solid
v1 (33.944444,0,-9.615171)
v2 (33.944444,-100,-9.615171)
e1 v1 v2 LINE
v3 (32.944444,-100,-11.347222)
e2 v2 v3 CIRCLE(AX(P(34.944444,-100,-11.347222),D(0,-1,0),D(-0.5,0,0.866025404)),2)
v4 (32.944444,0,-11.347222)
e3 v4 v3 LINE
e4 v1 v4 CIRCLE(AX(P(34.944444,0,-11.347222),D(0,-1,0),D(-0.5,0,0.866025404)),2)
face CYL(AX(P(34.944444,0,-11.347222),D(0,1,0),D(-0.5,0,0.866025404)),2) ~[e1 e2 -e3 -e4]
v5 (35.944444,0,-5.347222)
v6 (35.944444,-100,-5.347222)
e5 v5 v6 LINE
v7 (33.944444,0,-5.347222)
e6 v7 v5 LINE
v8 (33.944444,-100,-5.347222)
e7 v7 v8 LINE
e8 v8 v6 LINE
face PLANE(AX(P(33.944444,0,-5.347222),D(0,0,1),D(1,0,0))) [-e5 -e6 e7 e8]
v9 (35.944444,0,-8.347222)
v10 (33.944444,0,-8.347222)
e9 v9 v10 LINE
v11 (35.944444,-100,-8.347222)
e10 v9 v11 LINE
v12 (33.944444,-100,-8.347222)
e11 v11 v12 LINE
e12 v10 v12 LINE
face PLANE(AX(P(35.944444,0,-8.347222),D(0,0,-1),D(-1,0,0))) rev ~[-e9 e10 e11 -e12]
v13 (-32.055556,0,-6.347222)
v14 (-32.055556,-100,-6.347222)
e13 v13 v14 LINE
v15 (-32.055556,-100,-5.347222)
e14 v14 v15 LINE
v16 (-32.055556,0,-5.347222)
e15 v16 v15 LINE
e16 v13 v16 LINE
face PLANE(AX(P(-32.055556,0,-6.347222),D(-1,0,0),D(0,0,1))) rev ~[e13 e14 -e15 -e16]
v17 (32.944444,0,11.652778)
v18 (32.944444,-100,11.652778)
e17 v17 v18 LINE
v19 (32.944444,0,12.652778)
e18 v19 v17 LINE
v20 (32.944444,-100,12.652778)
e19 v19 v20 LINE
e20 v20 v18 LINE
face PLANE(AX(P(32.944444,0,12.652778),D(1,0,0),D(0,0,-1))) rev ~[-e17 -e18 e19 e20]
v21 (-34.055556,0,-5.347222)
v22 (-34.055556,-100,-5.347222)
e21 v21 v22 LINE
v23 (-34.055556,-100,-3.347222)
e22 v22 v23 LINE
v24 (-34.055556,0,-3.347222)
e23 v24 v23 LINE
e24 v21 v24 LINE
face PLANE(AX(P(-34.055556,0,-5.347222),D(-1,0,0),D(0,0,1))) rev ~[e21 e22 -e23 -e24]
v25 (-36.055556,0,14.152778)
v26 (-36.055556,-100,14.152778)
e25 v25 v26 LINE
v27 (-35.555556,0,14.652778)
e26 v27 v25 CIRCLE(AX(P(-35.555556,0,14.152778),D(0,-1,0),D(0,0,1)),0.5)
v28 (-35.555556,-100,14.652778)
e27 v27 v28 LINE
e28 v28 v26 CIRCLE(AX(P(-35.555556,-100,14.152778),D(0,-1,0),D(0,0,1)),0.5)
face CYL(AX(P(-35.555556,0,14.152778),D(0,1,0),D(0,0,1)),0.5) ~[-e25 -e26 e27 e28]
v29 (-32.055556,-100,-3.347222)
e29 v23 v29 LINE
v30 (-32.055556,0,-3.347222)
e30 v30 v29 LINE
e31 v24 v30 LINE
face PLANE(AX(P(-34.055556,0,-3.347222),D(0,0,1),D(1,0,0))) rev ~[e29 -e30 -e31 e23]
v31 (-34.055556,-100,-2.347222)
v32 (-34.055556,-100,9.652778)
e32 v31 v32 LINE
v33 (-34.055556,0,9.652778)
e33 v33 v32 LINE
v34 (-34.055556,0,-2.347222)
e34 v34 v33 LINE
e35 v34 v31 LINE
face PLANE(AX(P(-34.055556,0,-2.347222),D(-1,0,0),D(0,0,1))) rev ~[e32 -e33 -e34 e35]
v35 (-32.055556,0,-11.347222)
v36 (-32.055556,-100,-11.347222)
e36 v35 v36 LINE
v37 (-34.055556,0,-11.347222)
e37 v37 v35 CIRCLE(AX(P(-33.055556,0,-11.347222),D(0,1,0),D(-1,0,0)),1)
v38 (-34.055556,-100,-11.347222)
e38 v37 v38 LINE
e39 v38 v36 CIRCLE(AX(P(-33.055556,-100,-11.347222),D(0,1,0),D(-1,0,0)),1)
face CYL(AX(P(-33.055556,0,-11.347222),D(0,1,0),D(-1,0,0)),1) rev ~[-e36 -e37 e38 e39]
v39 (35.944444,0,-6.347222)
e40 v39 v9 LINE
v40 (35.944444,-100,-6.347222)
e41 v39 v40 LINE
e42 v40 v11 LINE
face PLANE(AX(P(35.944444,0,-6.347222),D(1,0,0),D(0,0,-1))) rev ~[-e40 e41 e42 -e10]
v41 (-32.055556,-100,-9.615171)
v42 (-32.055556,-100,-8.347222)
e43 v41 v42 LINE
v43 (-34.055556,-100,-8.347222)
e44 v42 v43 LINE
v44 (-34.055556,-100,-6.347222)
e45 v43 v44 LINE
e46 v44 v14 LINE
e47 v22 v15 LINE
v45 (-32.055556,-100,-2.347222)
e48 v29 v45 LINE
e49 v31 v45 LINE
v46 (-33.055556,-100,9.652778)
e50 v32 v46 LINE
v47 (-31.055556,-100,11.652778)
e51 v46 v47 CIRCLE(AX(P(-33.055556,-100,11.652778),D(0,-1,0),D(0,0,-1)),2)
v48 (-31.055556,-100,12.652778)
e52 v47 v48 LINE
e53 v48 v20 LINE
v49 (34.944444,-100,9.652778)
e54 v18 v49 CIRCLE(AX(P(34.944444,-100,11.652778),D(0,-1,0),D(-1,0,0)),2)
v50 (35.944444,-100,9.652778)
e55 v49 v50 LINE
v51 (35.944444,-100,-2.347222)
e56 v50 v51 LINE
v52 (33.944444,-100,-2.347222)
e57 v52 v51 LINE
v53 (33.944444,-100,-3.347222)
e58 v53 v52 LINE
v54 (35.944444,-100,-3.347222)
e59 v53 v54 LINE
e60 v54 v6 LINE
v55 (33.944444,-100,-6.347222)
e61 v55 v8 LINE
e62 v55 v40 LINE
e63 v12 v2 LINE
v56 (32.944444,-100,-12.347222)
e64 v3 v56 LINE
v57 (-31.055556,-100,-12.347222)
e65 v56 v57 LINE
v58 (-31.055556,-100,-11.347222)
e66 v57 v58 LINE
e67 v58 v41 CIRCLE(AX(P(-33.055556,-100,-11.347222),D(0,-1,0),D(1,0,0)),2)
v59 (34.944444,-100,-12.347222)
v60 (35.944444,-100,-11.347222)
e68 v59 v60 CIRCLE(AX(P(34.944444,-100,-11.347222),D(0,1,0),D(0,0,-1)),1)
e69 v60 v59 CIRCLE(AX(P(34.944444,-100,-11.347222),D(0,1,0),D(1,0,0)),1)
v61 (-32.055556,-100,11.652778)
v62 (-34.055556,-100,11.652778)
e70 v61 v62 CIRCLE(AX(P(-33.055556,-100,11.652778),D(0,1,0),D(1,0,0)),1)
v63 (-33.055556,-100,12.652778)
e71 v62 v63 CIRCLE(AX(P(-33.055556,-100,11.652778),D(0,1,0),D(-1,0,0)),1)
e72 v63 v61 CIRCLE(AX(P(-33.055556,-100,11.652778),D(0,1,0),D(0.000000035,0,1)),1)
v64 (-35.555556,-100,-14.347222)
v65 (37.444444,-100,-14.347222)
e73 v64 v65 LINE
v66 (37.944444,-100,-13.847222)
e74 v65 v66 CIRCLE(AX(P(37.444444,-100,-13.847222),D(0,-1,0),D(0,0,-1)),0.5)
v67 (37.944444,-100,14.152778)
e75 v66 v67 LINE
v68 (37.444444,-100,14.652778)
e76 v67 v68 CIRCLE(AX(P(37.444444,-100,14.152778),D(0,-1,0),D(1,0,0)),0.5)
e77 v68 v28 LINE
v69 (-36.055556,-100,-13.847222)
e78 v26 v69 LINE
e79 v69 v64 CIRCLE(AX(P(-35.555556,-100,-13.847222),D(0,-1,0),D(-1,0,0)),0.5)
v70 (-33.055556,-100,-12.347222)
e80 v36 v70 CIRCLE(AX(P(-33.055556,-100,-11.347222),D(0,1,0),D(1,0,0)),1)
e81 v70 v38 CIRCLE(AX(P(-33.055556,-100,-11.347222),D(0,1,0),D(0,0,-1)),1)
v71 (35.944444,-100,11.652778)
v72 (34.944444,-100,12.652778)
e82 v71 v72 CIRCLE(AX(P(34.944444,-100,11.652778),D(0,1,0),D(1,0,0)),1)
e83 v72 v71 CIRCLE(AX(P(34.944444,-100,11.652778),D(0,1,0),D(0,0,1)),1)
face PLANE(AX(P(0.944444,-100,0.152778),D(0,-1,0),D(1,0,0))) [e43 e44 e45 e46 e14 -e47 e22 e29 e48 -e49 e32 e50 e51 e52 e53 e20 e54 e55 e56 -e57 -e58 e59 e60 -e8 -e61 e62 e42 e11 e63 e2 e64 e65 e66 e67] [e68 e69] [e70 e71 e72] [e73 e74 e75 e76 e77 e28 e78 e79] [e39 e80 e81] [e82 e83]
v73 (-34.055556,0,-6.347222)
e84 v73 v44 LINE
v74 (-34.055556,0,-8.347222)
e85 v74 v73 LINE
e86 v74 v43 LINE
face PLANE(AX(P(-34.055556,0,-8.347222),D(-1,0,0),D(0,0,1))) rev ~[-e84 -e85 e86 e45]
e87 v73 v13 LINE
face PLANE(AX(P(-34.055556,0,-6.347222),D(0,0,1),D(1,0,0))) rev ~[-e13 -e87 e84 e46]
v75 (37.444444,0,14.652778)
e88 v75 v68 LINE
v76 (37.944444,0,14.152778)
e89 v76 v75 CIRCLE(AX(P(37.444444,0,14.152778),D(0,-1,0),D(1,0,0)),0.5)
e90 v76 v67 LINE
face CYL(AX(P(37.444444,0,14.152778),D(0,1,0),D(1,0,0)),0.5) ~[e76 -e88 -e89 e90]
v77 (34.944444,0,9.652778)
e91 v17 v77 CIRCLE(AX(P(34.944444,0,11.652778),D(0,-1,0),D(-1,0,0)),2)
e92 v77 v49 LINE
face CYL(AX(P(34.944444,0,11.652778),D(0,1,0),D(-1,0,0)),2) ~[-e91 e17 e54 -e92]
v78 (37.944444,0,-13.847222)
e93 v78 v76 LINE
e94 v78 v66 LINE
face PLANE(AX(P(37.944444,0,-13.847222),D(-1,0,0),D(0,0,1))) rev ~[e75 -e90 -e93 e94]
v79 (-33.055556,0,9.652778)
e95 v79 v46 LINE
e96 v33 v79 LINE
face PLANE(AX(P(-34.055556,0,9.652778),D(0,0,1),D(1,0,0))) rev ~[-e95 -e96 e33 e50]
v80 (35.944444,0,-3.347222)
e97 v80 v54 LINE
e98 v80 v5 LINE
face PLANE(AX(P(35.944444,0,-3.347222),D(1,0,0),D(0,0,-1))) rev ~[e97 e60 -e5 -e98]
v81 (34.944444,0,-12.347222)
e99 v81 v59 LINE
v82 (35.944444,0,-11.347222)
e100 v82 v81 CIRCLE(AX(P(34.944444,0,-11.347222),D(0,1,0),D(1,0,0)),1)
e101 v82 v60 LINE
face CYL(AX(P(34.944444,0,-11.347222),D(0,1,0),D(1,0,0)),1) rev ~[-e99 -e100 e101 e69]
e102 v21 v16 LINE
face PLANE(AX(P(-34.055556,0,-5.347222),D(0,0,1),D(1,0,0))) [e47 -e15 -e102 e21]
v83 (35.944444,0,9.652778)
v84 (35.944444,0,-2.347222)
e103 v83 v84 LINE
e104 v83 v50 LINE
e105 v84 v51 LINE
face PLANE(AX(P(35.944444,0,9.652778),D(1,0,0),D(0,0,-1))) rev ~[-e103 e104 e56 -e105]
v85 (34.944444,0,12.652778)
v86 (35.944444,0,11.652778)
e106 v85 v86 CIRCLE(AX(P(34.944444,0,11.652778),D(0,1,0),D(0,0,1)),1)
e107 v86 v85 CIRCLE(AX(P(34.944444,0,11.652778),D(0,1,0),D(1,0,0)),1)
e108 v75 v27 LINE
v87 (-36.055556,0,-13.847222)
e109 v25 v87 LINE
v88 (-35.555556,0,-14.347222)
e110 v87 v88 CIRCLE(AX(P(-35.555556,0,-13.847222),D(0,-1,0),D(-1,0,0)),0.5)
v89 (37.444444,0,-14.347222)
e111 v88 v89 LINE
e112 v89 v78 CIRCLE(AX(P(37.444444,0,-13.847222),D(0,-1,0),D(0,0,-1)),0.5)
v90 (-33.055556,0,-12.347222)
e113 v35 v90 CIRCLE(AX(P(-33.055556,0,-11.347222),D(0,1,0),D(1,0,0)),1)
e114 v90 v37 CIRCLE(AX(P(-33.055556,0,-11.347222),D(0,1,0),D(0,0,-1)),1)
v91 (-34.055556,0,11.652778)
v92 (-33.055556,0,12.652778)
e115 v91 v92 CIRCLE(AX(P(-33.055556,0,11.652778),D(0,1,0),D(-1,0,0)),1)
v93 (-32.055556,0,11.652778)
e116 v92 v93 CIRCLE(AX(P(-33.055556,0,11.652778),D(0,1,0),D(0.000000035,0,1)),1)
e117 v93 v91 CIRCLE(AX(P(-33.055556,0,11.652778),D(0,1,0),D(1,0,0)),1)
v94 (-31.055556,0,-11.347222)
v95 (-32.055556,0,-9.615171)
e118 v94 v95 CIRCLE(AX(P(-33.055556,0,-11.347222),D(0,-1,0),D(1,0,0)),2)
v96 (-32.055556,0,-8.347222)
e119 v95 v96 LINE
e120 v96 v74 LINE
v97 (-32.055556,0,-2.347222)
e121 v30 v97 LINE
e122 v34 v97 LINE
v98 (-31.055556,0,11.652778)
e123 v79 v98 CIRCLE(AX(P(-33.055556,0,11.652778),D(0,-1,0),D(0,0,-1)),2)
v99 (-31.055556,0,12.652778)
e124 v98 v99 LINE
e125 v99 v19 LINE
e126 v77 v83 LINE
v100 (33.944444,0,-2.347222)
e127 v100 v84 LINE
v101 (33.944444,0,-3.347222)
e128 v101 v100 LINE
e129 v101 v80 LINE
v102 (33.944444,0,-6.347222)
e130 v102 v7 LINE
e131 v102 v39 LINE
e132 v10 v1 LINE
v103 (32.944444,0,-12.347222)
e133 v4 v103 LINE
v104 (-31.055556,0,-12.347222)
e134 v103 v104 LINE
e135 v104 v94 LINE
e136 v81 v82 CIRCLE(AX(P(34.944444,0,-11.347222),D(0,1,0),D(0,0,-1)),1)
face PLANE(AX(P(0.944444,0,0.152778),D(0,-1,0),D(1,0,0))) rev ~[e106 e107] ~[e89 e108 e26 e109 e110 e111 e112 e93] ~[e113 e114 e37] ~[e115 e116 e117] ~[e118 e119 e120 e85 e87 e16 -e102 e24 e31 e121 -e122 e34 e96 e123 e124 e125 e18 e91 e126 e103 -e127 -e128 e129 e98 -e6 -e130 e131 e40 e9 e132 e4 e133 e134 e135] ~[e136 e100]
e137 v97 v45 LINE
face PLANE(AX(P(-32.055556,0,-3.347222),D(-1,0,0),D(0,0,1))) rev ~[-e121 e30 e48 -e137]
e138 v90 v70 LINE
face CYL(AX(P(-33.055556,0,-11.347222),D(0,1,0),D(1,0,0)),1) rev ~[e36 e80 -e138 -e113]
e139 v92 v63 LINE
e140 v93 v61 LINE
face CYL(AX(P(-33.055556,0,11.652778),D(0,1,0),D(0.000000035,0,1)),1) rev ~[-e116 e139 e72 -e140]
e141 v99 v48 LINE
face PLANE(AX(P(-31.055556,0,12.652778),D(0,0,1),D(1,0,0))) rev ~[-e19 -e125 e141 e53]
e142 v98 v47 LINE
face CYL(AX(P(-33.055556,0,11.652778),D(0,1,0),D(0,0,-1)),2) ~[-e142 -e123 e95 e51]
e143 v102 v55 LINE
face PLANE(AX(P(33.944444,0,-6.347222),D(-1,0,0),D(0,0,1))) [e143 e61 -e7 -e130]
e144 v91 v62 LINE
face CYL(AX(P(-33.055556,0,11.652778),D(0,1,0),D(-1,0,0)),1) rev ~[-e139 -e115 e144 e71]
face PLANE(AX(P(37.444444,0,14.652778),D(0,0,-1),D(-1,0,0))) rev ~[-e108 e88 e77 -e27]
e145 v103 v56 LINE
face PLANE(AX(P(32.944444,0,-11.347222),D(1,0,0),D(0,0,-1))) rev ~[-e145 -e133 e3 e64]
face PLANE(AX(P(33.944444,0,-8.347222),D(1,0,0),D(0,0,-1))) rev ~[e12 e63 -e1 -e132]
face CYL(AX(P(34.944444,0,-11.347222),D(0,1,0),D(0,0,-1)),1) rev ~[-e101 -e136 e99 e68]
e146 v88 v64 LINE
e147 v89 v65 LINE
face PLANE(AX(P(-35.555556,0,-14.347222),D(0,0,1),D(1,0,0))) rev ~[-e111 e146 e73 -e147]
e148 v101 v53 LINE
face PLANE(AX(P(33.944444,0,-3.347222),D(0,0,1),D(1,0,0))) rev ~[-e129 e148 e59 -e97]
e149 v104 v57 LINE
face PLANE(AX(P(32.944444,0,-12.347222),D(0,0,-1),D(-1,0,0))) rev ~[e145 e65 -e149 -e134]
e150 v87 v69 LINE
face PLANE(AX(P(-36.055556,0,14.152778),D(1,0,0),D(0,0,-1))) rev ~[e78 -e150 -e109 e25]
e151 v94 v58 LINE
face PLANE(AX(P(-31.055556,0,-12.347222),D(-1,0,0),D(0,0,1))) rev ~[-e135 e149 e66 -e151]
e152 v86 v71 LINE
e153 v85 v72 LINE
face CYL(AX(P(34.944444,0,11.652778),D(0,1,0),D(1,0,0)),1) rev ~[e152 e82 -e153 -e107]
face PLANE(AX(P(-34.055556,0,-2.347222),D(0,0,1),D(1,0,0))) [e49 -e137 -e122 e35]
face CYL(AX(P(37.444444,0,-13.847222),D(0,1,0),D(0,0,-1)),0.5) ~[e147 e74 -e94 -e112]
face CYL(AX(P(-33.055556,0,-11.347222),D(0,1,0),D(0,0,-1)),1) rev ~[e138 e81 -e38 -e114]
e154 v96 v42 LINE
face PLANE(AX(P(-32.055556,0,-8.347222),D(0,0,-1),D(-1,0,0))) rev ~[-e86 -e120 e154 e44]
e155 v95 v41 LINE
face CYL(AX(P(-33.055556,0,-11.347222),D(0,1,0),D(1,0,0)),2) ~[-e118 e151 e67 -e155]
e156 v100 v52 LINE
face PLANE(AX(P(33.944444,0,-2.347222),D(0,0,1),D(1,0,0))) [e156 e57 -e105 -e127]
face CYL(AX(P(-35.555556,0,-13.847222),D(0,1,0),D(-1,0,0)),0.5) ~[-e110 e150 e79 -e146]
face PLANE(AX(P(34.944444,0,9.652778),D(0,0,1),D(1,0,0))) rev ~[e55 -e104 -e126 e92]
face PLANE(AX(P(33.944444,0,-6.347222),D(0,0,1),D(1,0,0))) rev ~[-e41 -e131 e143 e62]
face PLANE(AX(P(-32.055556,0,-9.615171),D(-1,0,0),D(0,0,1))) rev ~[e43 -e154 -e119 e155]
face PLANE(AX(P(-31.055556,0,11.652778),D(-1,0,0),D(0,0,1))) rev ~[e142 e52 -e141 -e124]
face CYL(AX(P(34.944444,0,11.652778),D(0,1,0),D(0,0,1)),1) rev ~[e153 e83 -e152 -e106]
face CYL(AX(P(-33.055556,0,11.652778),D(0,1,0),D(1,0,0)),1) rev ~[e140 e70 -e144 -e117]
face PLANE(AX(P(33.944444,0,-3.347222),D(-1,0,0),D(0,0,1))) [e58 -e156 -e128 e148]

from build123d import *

# Parameters (mm, degrees)
F0_W     = 2
F0_H     = 1
F1_DEPTH = 100


with BuildPart() as f1:
    # F0 (on Front) → F1 (new body)
    with BuildSketch(Plane.XZ):
        with BuildLine():
            Line((37.4444444444, 14.6527777778), (-35.5555555556, 14.6527777778))
            ThreePointArc((-35.5555555556, 14.6527777778), (-35.9091089461, 14.5063311684), (-36.0555555556, 14.1527777778))
            Line((-36.0555555556, 14.1527777778), (-36.0555555556, -13.8472222222))
            ThreePointArc((-36.0555555556, -13.8472222222), (-35.9091089461, -14.2007756128), (-35.5555555556, -14.3472222222))
            Line((-35.5555555556, -14.3472222222), (37.4444444444, -14.3472222222))
            ThreePointArc((37.4444444444, -14.3472222222), (37.797997835, -14.2007756128), (37.9444444444, -13.8472222222))
            Line((37.9444444444, -13.8472222222), (37.9444444444, 14.1527777778))
            ThreePointArc((37.9444444444, 14.1527777778), (37.797997835, 14.5063311684), (37.4444444444, 14.6527777778))
        make_face()
        Polygon((-31.0555555556, 12.6527777778), (32.9444444444, 12.6527777778), (34.9444444444, 12.6527777778), (35.9444444444, 12.6527777778), (35.9444444444, 11.6527777778), (35.9444444444, 9.6527777778), (35.9444444444, -2.3472222222), (35.9444444444, -3.3472222222), (35.9444444444, -5.3472222222), (35.9444444444, -6.3472222222), (35.9444444444, -8.3472222222), (35.9444444444, -9.3472222222), (35.9444444444, -11.3472222222), (35.9444444444, -12.3472222222), (34.9444444444, -12.3472222222), (32.9444444444, -12.3472222222), (-31.0555555556, -12.3472222222), (-33.0555555556, -12.3472222222), (-34.0555555556, -12.3472222222), (-34.0555555556, -11.3472222222), (-34.0555555556, -9.3472222222), (-34.0555555556, -8.3472222222), (-34.0555555556, -6.3472222222), (-34.0555555556, -5.3472222222), (-34.0555555556, -3.3472222222), (-34.0555555556, -2.3472222222), (-34.0555555556, 9.6527777778), (-34.0555555556, 11.6527777778), (-34.0555555556, 12.6527777778), (-33.0555555206, 12.6527777778), align=None, mode=Mode.SUBTRACT)
        with BuildLine():
            Line((34.9444444444, 12.6527777778), (32.9444444444, 12.6527777778))
            Line((32.9444444444, 12.6527777778), (32.9444444444, 11.6527777778))
            ThreePointArc((32.9444444444, 11.6527777778), (33.5302308821, 10.2385642154), (34.9444444444, 9.6527777778))
            Line((34.9444444444, 9.6527777778), (35.9444444444, 9.6527777778))
            Line((35.9444444444, 9.6527777778), (35.9444444444, 11.6527777778))
            ThreePointArc((35.9444444444, 11.6527777778), (34.2373376633, 10.9456709966), (34.9444444444, 12.6527777778))
        make_face()
        with BuildLine():
            Line((35.9444444444, -11.3472222222), (35.9444444444, -9.3472222222))
            Line((35.9444444444, -9.3472222222), (34.9444444444, -9.3472222222))
            ThreePointArc((34.9444444444, -9.3472222222), (34.4268063542, -9.4153705696), (33.9444444444, -9.6151714147))
            ThreePointArc((33.9444444444, -9.6151714147), (33.2123936369, -10.3472222222), (32.9444444444, -11.3472222222))
            Line((32.9444444444, -11.3472222222), (32.9444444444, -12.3472222222))
            Line((32.9444444444, -12.3472222222), (34.9444444444, -12.3472222222))
            ThreePointArc((34.9444444444, -12.3472222222), (34.2373376633, -10.640115441), (35.9444444444, -11.3472222222))
        make_face()
        with BuildLine():
            Line((-31.0555555556, 11.6527777778), (-31.0555555556, 12.6527777778))
            Line((-31.0555555556, 12.6527777778), (-33.0555555206, 12.6527777778))
            ThreePointArc((-33.0555555206, 12.6527777778), (-32.348448762, 12.3598845466), (-32.0555555556, 11.6527777778))
            ThreePointArc((-32.0555555556, 11.6527777778), (-33.0555555556, 10.6527777778), (-34.0555555556, 11.6527777778))
            Line((-34.0555555556, 11.6527777778), (-34.0555555556, 9.6527777778))
            Line((-34.0555555556, 9.6527777778), (-33.0555555556, 9.6527777778))
            ThreePointArc((-33.0555555556, 9.6527777778), (-31.6413419932, 10.2385642154), (-31.0555555556, 11.6527777778))
        make_face()
        with BuildLine():
            Line((-33.0555555556, -9.3472222222), (-34.0555555556, -9.3472222222))
            Line((-34.0555555556, -9.3472222222), (-34.0555555556, -11.3472222222))
            ThreePointArc((-34.0555555556, -11.3472222222), (-33.0555555556, -10.3472222222), (-32.0555555556, -11.3472222222))
            ThreePointArc((-32.0555555556, -11.3472222222), (-32.3484487744, -12.0543290034), (-33.0555555556, -12.3472222222))
            Line((-33.0555555556, -12.3472222222), (-31.0555555556, -12.3472222222))
            Line((-31.0555555556, -12.3472222222), (-31.0555555556, -11.3472222222))
            ThreePointArc((-31.0555555556, -11.3472222222), (-31.323504748, -10.3472222222), (-32.0555555556, -9.6151714147))
            ThreePointArc((-32.0555555556, -9.6151714147), (-32.5379174654, -9.4153705696), (-33.0555555556, -9.3472222222))
        make_face()
        with BuildLine():
            Line((35.9444444444, -9.3472222222), (35.9444444444, -8.3472222222))
            Line((35.9444444444, -8.3472222222), (33.9444444444, -8.3472222222))
            Line((33.9444444444, -8.3472222222), (33.9444444444, -9.6151714147))
            ThreePointArc((33.9444444444, -9.6151714147), (34.4268063542, -9.4153705696), (34.9444444444, -9.3472222222))
            Line((34.9444444444, -9.3472222222), (35.9444444444, -9.3472222222))
        make_face()
        with BuildLine():
            Line((-32.0555555556, -8.3472222222), (-34.0555555556, -8.3472222222))
            Line((-34.0555555556, -8.3472222222), (-34.0555555556, -9.3472222222))
            Line((-34.0555555556, -9.3472222222), (-33.0555555556, -9.3472222222))
            ThreePointArc((-33.0555555556, -9.3472222222), (-32.5379174654, -9.4153705696), (-32.0555555556, -9.6151714147))
            Line((-32.0555555556, -9.6151714147), (-32.0555555556, -8.3472222222))
        make_face()
        with Locations((34.9444444444, -5.8472222222)):
            Rectangle(F0_W, F0_H)
        with Locations((-33.0555555556, -5.8472222222)):
            Rectangle(F0_W, F0_H)
        with Locations((-33.0555555556, -2.8472222222)):
            Rectangle(F0_W, F0_H)
        with Locations((34.9444444444, -2.8472222222)):
            Rectangle(F0_W, F0_H)
        with BuildLine():
            Line((35.9444444444, 12.6527777778), (34.9444444444, 12.6527777778))
            ThreePointArc((34.9444444444, 12.6527777778), (35.6515512256, 12.359884559), (35.9444444444, 11.6527777778))
            Line((35.9444444444, 11.6527777778), (35.9444444444, 12.6527777778))
        make_face()
        with BuildLine():
            Line((35.9444444444, -12.3472222222), (35.9444444444, -11.3472222222))
            ThreePointArc((35.9444444444, -11.3472222222), (35.6515512256, -12.0543290034), (34.9444444444, -12.3472222222))
            Line((34.9444444444, -12.3472222222), (35.9444444444, -12.3472222222))
        make_face()
        with BuildLine():
            ThreePointArc((-34.0555555556, 11.6527777778), (-33.7626623244, 12.3598845713), (-33.0555555206, 12.6527777778))
            Line((-33.0555555206, 12.6527777778), (-34.0555555556, 12.6527777778))
            Line((-34.0555555556, 12.6527777778), (-34.0555555556, 11.6527777778))
        make_face()
        with BuildLine():
            ThreePointArc((-33.0555555556, -12.3472222222), (-33.7626623367, -12.0543290034), (-34.0555555556, -11.3472222222))
            Line((-34.0555555556, -11.3472222222), (-34.0555555556, -12.3472222222))
            Line((-34.0555555556, -12.3472222222), (-33.0555555556, -12.3472222222))
        make_face()
    extrude(amount=F1_DEPTH)


solid = f1.part
